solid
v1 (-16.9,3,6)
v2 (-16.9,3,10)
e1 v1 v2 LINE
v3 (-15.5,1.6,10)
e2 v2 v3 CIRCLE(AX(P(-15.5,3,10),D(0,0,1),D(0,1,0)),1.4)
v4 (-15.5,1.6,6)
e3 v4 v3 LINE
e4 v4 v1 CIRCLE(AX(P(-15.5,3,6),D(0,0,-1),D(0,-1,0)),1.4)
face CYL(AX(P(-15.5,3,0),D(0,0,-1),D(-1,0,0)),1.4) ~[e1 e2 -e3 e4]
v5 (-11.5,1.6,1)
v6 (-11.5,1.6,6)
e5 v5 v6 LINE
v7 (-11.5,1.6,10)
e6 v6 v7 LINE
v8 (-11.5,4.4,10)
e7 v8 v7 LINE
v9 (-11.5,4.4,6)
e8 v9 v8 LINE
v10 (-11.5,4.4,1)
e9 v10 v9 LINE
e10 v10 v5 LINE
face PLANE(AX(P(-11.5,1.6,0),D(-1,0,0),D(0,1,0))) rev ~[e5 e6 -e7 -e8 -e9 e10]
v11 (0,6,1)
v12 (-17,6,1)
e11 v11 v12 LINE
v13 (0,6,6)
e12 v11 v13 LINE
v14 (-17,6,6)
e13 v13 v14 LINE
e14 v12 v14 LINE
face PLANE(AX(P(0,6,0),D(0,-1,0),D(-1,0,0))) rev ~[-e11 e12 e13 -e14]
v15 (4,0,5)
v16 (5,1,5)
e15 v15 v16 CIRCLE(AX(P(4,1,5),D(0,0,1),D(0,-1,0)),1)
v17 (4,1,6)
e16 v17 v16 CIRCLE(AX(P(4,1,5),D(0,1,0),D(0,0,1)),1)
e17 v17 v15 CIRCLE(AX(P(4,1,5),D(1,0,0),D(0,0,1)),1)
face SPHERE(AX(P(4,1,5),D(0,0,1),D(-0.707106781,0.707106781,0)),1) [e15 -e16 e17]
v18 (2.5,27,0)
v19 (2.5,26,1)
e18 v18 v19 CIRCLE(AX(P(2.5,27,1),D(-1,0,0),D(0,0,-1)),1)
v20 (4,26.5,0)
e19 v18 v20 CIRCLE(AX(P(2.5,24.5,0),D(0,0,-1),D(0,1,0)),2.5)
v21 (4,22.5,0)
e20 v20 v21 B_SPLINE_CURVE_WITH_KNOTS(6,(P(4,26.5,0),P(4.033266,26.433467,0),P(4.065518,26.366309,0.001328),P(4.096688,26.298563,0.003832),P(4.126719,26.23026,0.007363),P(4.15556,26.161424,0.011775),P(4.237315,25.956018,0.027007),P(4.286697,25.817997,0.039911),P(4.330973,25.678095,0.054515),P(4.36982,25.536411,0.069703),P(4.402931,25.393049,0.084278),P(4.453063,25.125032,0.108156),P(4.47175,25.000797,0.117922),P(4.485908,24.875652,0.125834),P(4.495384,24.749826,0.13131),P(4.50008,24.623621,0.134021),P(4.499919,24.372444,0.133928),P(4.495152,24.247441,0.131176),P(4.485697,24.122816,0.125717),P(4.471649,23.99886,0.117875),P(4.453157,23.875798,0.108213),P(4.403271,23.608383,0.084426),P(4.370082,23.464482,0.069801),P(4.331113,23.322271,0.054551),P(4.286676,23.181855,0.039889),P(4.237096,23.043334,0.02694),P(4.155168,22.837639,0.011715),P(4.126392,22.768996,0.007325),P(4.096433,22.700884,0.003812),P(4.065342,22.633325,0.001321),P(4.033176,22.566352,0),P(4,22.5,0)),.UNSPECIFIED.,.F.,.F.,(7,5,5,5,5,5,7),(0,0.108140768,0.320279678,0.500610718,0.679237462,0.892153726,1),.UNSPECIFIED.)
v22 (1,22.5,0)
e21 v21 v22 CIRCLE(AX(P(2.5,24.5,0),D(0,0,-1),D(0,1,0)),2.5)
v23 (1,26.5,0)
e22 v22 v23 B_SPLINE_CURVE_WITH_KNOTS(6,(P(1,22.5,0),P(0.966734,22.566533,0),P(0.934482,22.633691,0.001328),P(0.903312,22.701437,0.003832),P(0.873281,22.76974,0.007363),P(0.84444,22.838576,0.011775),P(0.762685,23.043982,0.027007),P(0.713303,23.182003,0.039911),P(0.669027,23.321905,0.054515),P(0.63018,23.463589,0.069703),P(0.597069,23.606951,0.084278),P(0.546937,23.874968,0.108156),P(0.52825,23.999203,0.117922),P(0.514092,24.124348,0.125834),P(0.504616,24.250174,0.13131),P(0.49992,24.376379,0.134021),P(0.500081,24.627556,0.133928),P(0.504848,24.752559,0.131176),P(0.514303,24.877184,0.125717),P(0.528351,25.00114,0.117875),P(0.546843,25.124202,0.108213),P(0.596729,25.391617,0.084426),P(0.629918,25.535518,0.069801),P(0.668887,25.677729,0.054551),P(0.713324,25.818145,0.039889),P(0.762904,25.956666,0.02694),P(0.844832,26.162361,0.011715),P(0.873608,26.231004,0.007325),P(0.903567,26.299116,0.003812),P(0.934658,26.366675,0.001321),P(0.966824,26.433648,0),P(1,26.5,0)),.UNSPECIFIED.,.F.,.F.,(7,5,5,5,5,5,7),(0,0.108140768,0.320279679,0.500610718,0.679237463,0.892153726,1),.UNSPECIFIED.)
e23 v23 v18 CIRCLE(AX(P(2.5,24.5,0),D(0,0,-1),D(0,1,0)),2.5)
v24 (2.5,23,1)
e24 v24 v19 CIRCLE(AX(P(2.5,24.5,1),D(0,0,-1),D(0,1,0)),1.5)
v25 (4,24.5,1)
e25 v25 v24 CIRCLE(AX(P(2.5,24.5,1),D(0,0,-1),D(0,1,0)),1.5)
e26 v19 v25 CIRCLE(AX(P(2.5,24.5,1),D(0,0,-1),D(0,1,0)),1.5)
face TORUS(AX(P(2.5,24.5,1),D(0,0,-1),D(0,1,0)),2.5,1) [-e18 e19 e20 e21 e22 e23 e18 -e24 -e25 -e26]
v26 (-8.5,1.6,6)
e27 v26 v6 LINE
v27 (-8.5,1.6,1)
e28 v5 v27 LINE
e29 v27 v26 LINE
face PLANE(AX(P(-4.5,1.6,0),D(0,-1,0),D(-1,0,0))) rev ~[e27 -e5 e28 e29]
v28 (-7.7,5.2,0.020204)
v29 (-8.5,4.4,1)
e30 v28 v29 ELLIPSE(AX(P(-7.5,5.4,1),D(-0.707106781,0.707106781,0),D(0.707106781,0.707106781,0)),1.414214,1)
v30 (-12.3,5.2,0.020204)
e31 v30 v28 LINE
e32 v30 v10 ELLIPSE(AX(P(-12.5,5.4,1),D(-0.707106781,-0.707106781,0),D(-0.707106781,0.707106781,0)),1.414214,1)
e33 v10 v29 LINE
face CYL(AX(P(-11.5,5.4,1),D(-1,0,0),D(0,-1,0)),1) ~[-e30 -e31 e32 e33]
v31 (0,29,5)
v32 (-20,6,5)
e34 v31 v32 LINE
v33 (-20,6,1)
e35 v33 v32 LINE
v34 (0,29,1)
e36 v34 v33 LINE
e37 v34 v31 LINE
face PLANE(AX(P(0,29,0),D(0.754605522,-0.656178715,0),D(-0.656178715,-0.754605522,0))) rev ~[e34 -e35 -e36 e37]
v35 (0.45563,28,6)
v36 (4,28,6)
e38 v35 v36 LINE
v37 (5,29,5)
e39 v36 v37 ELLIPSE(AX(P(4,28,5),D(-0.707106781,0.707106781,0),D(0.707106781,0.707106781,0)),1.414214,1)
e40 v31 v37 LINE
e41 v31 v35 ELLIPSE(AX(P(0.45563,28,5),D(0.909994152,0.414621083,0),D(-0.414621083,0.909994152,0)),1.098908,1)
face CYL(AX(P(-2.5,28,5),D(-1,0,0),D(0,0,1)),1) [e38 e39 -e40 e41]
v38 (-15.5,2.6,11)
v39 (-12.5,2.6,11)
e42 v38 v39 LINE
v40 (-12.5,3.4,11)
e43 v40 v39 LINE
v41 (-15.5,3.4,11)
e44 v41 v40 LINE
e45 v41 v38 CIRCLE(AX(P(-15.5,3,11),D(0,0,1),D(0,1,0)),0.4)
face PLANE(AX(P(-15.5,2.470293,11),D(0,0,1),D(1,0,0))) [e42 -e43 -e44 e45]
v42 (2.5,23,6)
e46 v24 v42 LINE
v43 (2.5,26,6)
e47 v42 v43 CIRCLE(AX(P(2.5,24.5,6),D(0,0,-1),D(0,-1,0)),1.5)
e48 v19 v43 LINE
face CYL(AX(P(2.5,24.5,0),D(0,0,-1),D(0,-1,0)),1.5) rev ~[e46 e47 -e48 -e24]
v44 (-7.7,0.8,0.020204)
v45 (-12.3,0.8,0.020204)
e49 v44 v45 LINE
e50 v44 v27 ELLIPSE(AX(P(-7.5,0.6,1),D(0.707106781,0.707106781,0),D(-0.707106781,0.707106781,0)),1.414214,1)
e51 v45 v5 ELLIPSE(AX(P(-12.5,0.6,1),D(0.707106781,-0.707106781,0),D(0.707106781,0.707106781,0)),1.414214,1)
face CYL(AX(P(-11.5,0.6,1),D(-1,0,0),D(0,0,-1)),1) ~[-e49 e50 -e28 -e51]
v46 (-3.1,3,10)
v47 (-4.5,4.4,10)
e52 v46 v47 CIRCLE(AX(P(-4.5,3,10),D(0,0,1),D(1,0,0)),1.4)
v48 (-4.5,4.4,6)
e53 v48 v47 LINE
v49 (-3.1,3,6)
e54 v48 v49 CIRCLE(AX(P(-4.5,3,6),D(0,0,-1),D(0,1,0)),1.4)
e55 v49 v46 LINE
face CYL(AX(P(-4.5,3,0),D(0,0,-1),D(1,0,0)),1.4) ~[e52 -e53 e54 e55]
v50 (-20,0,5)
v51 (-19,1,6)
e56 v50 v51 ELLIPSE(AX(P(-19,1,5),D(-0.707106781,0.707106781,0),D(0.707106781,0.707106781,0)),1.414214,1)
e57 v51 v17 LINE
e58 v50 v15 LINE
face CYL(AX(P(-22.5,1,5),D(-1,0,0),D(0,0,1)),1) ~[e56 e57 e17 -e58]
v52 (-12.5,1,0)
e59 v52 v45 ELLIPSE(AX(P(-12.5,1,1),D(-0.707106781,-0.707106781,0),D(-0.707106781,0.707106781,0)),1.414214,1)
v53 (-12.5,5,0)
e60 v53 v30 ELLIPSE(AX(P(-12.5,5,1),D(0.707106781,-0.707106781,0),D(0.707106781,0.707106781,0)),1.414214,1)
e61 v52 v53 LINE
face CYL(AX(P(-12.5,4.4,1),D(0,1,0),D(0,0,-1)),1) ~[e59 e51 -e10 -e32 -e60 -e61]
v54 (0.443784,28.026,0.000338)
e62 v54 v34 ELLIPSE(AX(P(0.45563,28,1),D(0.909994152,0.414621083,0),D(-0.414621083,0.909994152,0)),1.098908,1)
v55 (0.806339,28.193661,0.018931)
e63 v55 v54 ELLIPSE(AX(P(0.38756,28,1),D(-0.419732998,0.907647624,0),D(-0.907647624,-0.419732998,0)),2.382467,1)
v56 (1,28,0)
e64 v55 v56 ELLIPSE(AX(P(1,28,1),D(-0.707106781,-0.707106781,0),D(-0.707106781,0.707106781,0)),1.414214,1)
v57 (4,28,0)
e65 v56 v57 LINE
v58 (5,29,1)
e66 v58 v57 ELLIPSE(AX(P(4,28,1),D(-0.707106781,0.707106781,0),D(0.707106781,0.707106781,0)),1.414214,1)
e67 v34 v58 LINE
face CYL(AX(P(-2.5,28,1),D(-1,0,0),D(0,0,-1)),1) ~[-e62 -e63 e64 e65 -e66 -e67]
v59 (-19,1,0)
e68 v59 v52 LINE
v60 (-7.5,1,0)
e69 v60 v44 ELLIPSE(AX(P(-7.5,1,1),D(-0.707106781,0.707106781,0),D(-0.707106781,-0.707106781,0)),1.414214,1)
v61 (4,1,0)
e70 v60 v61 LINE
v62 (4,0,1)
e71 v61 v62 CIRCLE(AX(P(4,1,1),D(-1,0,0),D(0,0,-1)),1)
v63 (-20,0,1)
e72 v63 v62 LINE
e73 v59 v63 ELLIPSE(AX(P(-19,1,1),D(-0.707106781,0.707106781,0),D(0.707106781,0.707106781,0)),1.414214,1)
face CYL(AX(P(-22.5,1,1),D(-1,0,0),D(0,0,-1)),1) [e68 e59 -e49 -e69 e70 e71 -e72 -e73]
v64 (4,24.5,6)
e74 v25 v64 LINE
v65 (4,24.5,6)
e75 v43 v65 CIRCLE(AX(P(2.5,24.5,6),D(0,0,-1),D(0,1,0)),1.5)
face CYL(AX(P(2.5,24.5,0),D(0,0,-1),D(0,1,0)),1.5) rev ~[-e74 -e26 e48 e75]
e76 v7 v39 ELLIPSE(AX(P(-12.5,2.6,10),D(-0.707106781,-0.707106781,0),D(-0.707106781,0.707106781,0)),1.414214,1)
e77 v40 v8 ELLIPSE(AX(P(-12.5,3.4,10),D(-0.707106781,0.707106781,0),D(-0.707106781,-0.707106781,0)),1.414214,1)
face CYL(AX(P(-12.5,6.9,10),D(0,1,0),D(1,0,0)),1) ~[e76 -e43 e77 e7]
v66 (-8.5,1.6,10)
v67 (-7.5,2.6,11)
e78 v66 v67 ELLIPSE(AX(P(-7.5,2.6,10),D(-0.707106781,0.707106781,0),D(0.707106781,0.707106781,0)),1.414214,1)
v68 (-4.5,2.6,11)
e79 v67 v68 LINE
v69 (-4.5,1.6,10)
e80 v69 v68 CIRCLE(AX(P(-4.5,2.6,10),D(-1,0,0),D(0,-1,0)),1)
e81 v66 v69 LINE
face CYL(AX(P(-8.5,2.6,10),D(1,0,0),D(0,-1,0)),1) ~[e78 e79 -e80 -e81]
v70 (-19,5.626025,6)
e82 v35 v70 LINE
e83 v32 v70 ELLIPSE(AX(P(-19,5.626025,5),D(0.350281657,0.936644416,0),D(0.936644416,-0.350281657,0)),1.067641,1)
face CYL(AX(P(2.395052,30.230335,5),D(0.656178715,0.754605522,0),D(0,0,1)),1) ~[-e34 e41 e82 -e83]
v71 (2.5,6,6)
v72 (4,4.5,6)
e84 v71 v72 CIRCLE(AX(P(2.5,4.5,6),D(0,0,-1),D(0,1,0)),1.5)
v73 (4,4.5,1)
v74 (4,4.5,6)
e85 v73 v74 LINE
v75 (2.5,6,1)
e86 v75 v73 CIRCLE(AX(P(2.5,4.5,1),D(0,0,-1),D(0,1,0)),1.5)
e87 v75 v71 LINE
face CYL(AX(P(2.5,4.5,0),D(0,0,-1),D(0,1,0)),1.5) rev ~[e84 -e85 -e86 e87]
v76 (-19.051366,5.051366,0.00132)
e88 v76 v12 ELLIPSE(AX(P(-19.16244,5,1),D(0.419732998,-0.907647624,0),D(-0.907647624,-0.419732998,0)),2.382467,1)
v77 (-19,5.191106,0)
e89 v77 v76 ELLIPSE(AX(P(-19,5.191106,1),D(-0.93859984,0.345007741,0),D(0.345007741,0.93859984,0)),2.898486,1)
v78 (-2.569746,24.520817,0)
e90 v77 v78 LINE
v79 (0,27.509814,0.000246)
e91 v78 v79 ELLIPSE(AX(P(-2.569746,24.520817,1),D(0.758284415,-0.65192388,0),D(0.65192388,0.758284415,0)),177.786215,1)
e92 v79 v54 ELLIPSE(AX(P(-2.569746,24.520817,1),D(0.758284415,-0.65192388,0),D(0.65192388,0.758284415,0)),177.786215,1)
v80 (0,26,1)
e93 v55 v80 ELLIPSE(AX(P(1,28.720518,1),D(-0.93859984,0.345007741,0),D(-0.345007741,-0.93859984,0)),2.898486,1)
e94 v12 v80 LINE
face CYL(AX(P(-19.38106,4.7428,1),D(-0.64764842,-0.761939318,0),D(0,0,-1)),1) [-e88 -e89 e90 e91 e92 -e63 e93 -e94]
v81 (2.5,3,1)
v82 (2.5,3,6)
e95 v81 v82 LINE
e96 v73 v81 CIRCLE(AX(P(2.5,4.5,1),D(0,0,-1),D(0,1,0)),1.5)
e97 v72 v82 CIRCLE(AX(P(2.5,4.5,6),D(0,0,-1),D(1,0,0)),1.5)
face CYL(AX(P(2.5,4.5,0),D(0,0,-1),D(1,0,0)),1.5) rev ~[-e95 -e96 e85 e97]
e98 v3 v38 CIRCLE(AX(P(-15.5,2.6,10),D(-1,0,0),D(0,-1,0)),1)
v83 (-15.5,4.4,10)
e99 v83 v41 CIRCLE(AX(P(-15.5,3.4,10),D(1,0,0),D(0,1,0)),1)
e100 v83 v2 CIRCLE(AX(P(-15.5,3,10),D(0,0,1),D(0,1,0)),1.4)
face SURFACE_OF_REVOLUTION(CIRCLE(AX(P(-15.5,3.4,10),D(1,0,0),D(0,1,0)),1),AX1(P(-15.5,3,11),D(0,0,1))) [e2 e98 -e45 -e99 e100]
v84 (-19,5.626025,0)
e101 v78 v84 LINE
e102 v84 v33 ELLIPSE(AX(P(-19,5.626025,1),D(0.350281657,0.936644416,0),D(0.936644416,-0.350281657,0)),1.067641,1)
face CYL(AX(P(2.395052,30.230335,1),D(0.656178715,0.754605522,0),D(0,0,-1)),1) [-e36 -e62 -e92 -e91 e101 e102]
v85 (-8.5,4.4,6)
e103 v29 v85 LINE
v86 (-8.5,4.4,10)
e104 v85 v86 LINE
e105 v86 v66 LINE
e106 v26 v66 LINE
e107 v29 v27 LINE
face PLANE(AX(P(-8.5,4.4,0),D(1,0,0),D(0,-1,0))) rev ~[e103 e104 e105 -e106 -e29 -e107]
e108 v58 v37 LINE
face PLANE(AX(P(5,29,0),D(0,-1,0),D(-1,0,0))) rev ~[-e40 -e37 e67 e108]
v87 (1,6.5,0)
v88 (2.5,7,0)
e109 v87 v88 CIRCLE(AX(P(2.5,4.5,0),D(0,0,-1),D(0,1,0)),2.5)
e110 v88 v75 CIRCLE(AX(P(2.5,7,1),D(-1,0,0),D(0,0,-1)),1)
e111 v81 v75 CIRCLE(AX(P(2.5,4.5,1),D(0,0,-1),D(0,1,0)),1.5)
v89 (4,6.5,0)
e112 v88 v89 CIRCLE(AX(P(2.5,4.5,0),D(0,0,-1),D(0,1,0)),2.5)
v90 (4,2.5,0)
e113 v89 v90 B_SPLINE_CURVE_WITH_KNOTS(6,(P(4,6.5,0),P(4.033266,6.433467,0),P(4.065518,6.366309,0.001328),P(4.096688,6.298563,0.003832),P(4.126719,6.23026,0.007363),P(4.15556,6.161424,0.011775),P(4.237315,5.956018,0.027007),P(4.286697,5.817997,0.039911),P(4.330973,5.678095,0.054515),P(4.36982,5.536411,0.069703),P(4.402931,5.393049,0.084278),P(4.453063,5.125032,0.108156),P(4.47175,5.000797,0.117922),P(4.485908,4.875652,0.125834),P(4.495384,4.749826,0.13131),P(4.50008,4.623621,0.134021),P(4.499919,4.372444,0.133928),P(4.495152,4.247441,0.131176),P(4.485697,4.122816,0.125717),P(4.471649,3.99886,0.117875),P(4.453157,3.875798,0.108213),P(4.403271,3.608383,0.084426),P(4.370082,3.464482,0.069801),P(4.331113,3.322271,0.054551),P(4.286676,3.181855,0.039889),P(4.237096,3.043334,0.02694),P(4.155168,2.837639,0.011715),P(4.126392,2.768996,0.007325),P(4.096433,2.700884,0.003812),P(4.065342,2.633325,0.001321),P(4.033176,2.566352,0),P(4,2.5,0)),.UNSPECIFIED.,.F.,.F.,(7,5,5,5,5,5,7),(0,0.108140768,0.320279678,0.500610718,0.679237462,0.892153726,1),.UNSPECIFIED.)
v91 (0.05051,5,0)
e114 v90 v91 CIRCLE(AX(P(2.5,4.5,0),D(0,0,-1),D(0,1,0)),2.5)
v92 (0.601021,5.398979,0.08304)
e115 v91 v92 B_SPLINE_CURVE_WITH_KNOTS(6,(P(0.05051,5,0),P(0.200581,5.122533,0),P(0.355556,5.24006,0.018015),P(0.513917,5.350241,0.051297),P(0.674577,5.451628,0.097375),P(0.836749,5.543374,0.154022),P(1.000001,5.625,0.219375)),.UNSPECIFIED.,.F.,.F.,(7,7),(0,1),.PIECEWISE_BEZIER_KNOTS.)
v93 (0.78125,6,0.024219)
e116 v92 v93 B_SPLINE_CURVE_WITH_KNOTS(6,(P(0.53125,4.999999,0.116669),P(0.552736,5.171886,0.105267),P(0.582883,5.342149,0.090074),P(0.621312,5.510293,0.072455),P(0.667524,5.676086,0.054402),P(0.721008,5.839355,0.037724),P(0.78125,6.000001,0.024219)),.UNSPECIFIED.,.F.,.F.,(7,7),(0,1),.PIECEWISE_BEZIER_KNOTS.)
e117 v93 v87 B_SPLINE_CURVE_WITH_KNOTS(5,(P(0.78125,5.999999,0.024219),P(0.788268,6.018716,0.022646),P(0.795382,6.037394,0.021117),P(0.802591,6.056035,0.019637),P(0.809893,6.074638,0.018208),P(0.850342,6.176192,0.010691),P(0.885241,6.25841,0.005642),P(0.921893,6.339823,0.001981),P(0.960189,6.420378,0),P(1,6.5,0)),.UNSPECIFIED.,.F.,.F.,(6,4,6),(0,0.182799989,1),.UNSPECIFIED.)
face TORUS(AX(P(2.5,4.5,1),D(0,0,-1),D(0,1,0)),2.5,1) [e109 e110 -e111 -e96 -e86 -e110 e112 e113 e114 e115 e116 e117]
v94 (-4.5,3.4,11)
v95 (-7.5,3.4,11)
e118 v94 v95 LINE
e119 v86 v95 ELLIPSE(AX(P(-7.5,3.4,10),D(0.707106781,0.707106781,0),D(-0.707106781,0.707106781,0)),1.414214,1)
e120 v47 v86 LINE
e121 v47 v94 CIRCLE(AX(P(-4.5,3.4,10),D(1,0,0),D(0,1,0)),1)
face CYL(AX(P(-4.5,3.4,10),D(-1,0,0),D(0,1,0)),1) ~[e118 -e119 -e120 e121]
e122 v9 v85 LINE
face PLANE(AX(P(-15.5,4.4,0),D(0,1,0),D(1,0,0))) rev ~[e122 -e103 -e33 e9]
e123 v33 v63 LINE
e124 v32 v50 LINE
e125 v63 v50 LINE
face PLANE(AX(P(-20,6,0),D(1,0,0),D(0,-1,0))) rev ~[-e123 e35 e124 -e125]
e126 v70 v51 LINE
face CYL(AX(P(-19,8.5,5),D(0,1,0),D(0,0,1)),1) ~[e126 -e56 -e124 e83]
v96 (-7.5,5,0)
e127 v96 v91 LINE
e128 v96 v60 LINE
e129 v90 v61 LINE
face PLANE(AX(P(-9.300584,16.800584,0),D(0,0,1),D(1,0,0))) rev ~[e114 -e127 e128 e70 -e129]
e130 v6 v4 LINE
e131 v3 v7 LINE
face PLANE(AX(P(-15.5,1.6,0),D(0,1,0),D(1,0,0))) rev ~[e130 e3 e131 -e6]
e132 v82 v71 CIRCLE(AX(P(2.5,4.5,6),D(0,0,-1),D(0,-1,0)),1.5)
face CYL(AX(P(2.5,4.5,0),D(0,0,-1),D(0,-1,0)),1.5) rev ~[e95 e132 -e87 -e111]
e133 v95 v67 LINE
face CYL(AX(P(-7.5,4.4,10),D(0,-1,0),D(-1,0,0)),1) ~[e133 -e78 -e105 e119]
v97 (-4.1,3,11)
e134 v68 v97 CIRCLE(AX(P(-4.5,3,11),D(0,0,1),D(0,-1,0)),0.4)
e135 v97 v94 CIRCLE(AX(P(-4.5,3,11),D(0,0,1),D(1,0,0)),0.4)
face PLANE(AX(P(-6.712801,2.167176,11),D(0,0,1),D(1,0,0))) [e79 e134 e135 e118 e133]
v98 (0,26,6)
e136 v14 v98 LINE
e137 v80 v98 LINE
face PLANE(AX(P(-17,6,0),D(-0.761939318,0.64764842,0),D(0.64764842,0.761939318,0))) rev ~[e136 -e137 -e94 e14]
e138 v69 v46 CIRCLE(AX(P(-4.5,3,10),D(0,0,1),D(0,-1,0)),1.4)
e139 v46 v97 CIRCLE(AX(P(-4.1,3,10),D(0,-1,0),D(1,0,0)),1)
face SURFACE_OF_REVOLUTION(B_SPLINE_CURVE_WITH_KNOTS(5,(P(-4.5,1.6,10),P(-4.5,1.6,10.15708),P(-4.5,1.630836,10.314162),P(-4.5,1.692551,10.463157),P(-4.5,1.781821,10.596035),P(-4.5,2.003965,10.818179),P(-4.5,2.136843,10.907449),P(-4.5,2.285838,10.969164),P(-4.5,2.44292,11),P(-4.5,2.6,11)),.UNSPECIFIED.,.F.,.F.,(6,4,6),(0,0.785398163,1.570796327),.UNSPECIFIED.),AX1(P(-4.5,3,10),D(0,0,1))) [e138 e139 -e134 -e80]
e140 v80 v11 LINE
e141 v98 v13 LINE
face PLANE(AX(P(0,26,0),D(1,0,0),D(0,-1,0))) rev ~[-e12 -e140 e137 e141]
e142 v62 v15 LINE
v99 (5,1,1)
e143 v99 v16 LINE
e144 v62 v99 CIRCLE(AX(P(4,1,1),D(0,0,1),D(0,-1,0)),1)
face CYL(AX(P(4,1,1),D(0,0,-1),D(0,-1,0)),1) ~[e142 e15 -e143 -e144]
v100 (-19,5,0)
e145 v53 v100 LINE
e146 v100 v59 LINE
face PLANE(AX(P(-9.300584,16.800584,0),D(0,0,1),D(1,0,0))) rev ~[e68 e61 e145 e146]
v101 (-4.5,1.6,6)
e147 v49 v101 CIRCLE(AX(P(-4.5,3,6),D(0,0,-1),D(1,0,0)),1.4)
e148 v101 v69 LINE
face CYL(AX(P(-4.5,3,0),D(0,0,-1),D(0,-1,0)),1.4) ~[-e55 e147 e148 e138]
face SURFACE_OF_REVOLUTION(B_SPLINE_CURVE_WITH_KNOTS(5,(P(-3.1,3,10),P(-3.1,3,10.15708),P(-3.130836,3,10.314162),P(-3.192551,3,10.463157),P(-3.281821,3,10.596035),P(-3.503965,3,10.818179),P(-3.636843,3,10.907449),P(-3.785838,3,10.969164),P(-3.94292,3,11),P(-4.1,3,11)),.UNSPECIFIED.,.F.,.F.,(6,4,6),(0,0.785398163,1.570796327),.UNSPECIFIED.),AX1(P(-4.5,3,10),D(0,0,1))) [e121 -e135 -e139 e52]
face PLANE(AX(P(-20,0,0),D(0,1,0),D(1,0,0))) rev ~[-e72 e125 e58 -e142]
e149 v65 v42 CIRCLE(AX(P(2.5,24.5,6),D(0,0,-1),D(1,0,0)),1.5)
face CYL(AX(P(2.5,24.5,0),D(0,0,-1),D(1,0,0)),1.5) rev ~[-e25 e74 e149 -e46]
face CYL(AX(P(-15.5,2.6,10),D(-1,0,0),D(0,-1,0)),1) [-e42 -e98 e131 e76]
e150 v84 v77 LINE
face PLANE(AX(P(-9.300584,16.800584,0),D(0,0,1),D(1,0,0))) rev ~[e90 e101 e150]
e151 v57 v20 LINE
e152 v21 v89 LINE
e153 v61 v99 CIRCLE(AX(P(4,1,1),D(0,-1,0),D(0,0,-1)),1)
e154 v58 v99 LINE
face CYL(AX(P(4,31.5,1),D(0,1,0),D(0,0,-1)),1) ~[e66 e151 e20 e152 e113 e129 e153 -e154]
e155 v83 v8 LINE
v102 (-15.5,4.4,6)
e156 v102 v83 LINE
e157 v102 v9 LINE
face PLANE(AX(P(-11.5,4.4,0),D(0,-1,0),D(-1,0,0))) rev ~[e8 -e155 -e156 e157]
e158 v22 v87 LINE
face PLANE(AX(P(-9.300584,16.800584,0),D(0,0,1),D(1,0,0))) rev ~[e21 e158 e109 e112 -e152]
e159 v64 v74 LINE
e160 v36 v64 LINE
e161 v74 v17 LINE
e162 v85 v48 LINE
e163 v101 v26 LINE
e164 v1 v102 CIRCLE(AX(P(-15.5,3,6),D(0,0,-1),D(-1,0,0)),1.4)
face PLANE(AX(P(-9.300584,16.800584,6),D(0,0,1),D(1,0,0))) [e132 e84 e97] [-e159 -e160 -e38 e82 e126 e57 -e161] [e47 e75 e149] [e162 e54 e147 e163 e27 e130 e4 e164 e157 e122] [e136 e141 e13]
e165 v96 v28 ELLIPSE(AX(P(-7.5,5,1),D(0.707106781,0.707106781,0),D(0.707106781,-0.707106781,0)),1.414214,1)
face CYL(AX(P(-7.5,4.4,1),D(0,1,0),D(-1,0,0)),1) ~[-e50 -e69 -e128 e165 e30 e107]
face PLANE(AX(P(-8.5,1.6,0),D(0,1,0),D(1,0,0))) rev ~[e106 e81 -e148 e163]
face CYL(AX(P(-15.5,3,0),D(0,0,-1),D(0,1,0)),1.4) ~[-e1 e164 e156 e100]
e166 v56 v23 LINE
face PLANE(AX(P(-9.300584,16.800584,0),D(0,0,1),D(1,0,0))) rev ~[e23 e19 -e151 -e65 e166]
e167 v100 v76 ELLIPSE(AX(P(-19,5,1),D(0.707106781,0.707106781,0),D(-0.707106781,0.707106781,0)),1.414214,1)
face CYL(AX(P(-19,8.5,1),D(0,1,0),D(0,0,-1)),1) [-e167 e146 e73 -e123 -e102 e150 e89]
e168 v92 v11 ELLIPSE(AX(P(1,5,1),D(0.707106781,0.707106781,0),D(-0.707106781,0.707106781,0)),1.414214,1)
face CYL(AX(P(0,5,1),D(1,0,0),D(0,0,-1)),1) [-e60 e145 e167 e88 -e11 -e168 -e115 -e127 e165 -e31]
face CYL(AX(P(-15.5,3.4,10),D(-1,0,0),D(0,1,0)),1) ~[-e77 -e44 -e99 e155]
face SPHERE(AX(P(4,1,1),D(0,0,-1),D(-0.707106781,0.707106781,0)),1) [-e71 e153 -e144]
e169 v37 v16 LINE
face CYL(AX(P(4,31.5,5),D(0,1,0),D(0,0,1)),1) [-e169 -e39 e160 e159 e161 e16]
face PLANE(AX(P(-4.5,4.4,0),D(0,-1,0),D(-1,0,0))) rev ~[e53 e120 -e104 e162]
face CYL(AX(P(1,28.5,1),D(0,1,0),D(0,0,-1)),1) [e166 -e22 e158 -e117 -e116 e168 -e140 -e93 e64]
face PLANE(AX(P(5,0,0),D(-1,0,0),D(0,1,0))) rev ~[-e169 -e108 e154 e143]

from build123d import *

# Parameters (mm, degrees)
F1_DEPTH      = 6
F2_DEPTH      = 11
F3_R          = 1
F4_T1_DEPTH   = 35.4795013083
F4_T3_DEPTH   = 11
F4_T5_DEPTH   = 26.5
F4_T7_DEPTH   = 30.5
F4_T9_DEPTH   = 10
F4_T11_DEPTH  = 3
F4_T13_DEPTH  = 2.8
F4_T15_DEPTH  = 4
F4_T17_DEPTH  = 6.5
F4_T19_DEPTH  = 7.8
F4_S23_W      = 1
F4_S23_H      = 1
F4_T24_DEPTH  = 1
F4_S29_W      = 1
F4_S29_H      = 1
F4_T30_DEPTH  = 1
F4_T36_DEPTH  = 31.2488094968
F4_T42_DEPTH  = 22.5
F4_T47_DEPTH  = 19.5
F4_T54_ANGLE  = 180
F4_T59_DEPTH  = 5.5
F4_T63_DEPTH  = 5.3
F4_T70_DEPTH  = 5.3
F4_T74_DEPTH  = 5.5
F4_T81_DEPTH  = 5.3
F4_T85_DEPTH  = 5.5
F4_T92_DEPTH  = 5.5
F4_T96_DEPTH  = 5.3
F4_T103_DEPTH = 31.2488094968
F4_T107_DEPTH = 19.5
F4_T114_DEPTH = 31.2488094968
F4_T118_DEPTH = 22.5
F4_T125_DEPTH = 25
F4_T129_DEPTH = 22


# Not quite as in the source:
# - a fillet or chamfer that OpenCascade refuses, or shapes differently, is made with other operations: its cross-section is extruded or revolved along the edge and cut away or added


with BuildPart() as f1:
    # F0 (on Top) → F1 (new body)
    with BuildSketch(Plane.XY):
        Polygon((0, 29), (-20, 6), (-17, 6), (0, 26), align=None)
        with BuildLine():
            Line((0, 3), (0, 0))
            Line((0, 0), (2.5, 0))
            Line((2.5, 0), (2.5, 3))
            ThreePointArc((2.5, 3), (1, 4.5), (2.5, 6))
            Line((2.5, 6), (2.5, 23))
            ThreePointArc((2.5, 23), (1, 24.5), (2.5, 26))
            Line((2.5, 26), (2.5, 29))
            Line((2.5, 29), (0, 29))
            Line((0, 29), (0, 26))
            Line((0, 26), (0, 6))
            Line((0, 6), (0, 3))
        make_face()
        with BuildLine():
            Line((2.5, 3), (2.5, 0))
            Line((2.5, 0), (5, 0))
            Line((5, 0), (5, 15))
            Line((5, 15), (5, 29))
            Line((5, 29), (2.5, 29))
            Line((2.5, 29), (2.5, 26))
            ThreePointArc((2.5, 26), (3.5606601718, 25.5606601718), (4, 24.5))
            ThreePointArc((4, 24.5), (3.5606601718, 23.4393398282), (2.5, 23))
            Line((2.5, 23), (2.5, 6))
            ThreePointArc((2.5, 6), (3.5606601718, 5.5606601718), (4, 4.5))
            ThreePointArc((4, 4.5), (3.5606601718, 3.4393398282), (2.5, 3))
        make_face()
        with BuildLine():
            Line((-3.1, 3), (0, 3))
            Line((0, 3), (0, 6))
            Line((0, 6), (-17, 6))
            Line((-17, 6), (-20, 6))
            Line((-20, 6), (-20, 3))
            Line((-20, 3), (-16.9, 3))
            ThreePointArc((-16.9, 3), (-16.4899494937, 3.9899494937), (-15.5, 4.4))
            Line((-15.5, 4.4), (-11.5, 4.4))
            Line((-11.5, 4.4), (-10, 4.4))
            Line((-10, 4.4), (-8.5, 4.4))
            Line((-8.5, 4.4), (-4.5, 4.4))
            ThreePointArc((-4.5, 4.4), (-3.5100505063, 3.9899494937), (-3.1, 3))
        make_face()
        with BuildLine():
            Line((-20, 0), (0, 0))
            Line((0, 0), (0, 3))
            Line((0, 3), (-3.1, 3))
            ThreePointArc((-3.1, 3), (-3.5100505063, 2.0100505063), (-4.5, 1.6))
            Line((-4.5, 1.6), (-8.5, 1.6))
            Line((-8.5, 1.6), (-10, 1.6))
            Line((-10, 1.6), (-11.5, 1.6))
            Line((-11.5, 1.6), (-15.5, 1.6))
            ThreePointArc((-15.5, 1.6), (-16.4899494937, 2.0100505063), (-16.9, 3))
            Line((-16.9, 3), (-20, 3))
            Line((-20, 3), (-20, 0))
        make_face()
    extrude(amount=F1_DEPTH)

    # F0 (on Top) → F2 (join)
    with BuildSketch(Plane.XY):
        with BuildLine():
            Line((-14.1, 3), (-16.9, 3))
            ThreePointArc((-16.9, 3), (-16.4899494937, 2.0100505063), (-15.5, 1.6))
            ThreePointArc((-15.5, 1.6), (-14.5100505063, 2.0100505063), (-14.1, 3))
        make_face()
        with BuildLine():
            ThreePointArc((-4.5, 1.6), (-5.4899494937, 2.0100505063), (-5.9, 3))
            Line((-5.9, 3), (-8.5, 3))
            Line((-8.5, 3), (-8.5, 1.6))
            Line((-8.5, 1.6), (-4.5, 1.6))
        make_face()
        with BuildLine():
            Line((-11.5, 3), (-14.1, 3))
            ThreePointArc((-14.1, 3), (-14.5100505063, 2.0100505063), (-15.5, 1.6))
            Line((-15.5, 1.6), (-11.5, 1.6))
            Line((-11.5, 1.6), (-11.5, 3))
        make_face()
        with BuildLine():
            ThreePointArc((-15.5, 4.4), (-14.5100505063, 3.9899494937), (-14.1, 3))
            Line((-14.1, 3), (-11.5, 3))
            Line((-11.5, 3), (-11.5, 4.4))
            Line((-11.5, 4.4), (-15.5, 4.4))
        make_face()
        with BuildLine():
            Line((-8.5, 3), (-5.9, 3))
            ThreePointArc((-5.9, 3), (-5.4899494937, 3.9899494937), (-4.5, 4.4))
            Line((-4.5, 4.4), (-8.5, 4.4))
            Line((-8.5, 4.4), (-8.5, 3))
        make_face()
        with BuildLine():
            Line((-5.9, 3), (-3.1, 3))
            ThreePointArc((-3.1, 3), (-3.5100505063, 3.9899494937), (-4.5, 4.4))
            ThreePointArc((-4.5, 4.4), (-5.4899494937, 3.9899494937), (-5.9, 3))
        make_face()
        with BuildLine():
            ThreePointArc((-4.5, 1.6), (-3.5100505063, 2.0100505063), (-3.1, 3))
            Line((-3.1, 3), (-5.9, 3))
            ThreePointArc((-5.9, 3), (-5.4899494937, 2.0100505063), (-4.5, 1.6))
        make_face()
        with BuildLine():
            ThreePointArc((-15.5, 4.4), (-16.4899494937, 3.9899494937), (-16.9, 3))
            Line((-16.9, 3), (-14.1, 3))
            ThreePointArc((-14.1, 3), (-14.5100505063, 3.9899494937), (-15.5, 4.4))
        make_face()
    extrude(amount=F2_DEPTH)

    # F3
    f3_edges = [f1.edges().sort_by_distance(p)[0] for p in [
        (-6.5, 4.4, 11),
        (-8.5, 3, 11),
        (-6.5, 1.6, 11),
        (-3.1, 3, 11),
    ]]
    fillet(f3_edges, radius=F3_R)

    # F4: fillet of radius 1 on 24 edges, made by hand

    # F4_s2 → F4_t1 (cut)
    with BuildSketch(Plane(origin=(15.9999731598, 18.3999691337, 0), x_dir=(0, 0, 1), z_dir=(-0.6561787149, -0.7546055222, 0))):
        with BuildLine():
            ThreePointArc((0, 18.0291827328), (0.2928932188, 18.736289514), (1, 19.0291827328))
            Line((1, 19.0291827328), (0, 19.0291827328))
            Line((0, 19.0291827328), (0, 18.0291827328))
        make_face()
        with BuildLine():
            ThreePointArc((6, 18.0291827328), (5.7071067812, 18.736289514), (5, 19.0291827328))
            Line((5, 19.0291827328), (6, 19.0291827328))
            Line((6, 19.0291827328), (6, 18.0291827328))
        make_face()
    extrude(amount=F4_T1_DEPTH, mode=Mode.SUBTRACT)

    # F4_s4 → F4_t3 (cut)
    with BuildSketch(Plane.XZ.offset(-8.5)):
        with BuildLine():
            ThreePointArc((-19, 0), (-19.7071067812, 0.2928932188), (-20, 1))
            Line((-20, 1), (-20, 0))
            Line((-20, 0), (-19, 0))
        make_face()
        with BuildLine():
            ThreePointArc((-19, 6), (-19.7071067812, 5.7071067812), (-20, 5))
            Line((-20, 5), (-20, 6))
            Line((-20, 6), (-19, 6))
        make_face()
    extrude(amount=F4_T3_DEPTH, mode=Mode.SUBTRACT)

    # F4_s6 → F4_t5 (cut)
    with BuildSketch(Plane.YZ.offset(-22.5)):
        with BuildLine():
            ThreePointArc((1, 0), (0.2928932188, 0.2928932188), (0, 1))
            Line((0, 1), (0, 0))
            Line((0, 0), (1, 0))
        make_face()
        with BuildLine():
            ThreePointArc((1, 6), (0.2928932188, 5.7071067812), (0, 5))
            Line((0, 5), (0, 6))
            Line((0, 6), (1, 6))
        make_face()
    extrude(amount=F4_T5_DEPTH, mode=Mode.SUBTRACT)

    # F4_s8 → F4_t7 (cut)
    with BuildSketch(Plane.XZ.offset(-31.5)):
        with BuildLine():
            ThreePointArc((4, 0), (4.7071067812, 0.2928932188), (5, 1))
            Line((5, 1), (5, 0))
            Line((5, 0), (4, 0))
        make_face()
        with BuildLine():
            ThreePointArc((4, 6), (4.7071067812, 5.7071067812), (5, 5))
            Line((5, 5), (5, 6))
            Line((5, 6), (4, 6))
        make_face()
    extrude(amount=F4_T7_DEPTH, mode=Mode.SUBTRACT)

    # F4_s10 → F4_t9 (cut)
    with BuildSketch(Plane.YZ.offset(-2.5)):
        with BuildLine():
            ThreePointArc((28, 0), (28.7071067812, 0.2928932188), (29, 1))
            Line((29, 1), (29, 0))
            Line((29, 0), (28, 0))
        make_face()
        with BuildLine():
            ThreePointArc((28, 6), (28.7071067812, 5.7071067812), (29, 5))
            Line((29, 5), (29, 6))
            Line((29, 6), (28, 6))
        make_face()
    extrude(amount=F4_T9_DEPTH, mode=Mode.SUBTRACT)

    # F4_s12 → F4_t11 (cut)
    with BuildSketch(Plane.YZ.offset(-11.5)):
        with BuildLine():
            ThreePointArc((4.4, 1), (4.6928932188, 0.2928932188), (5.4, 0))
            Line((5.4, 0), (4.4, 0))
            Line((4.4, 0), (4.4, 1))
        make_face()
        with BuildLine():
            ThreePointArc((0.6, 0), (1.3071067812, 0.2928932188), (1.6, 1))
            Line((1.6, 1), (1.6, 0))
            Line((1.6, 0), (0.6, 0))
        make_face()
    extrude(amount=F4_T11_DEPTH, mode=Mode.SUBTRACT)

    # F4_s14 → F4_t13 (cut)
    with BuildSketch(Plane.XZ.offset(-4.4)):
        with BuildLine():
            ThreePointArc((-8.5, 1), (-8.2071067812, 0.2928932188), (-7.5, 0))
            Line((-7.5, 0), (-8.5, 0))
            Line((-8.5, 0), (-8.5, 1))
        make_face()
        with BuildLine():
            ThreePointArc((-12.5, 0), (-11.7928932188, 0.2928932188), (-11.5, 1))
            Line((-11.5, 1), (-11.5, 0))
            Line((-11.5, 0), (-12.5, 0))
        make_face()
    extrude(amount=F4_T13_DEPTH, mode=Mode.SUBTRACT)

    # F4_s16 → F4_t15 (cut)
    with BuildSketch(Plane.XY.offset(1)):
        with BuildLine():
            ThreePointArc((4, 0), (4.7071067812, 0.2928932188), (5, 1))
            Line((5, 1), (5, 0))
            Line((5, 0), (4, 0))
        make_face()
    extrude(amount=F4_T15_DEPTH, mode=Mode.SUBTRACT)

    # F4_s18 → F4_t17 (cut)
    with BuildSketch(Plane.YZ.offset(-15.5)):
        with BuildLine():
            ThreePointArc((4.4, 10), (4.1071067812, 10.7071067812), (3.4, 11))
            Line((3.4, 11), (4.4, 11))
            Line((4.4, 11), (4.4, 10))
        make_face()
        with BuildLine():
            ThreePointArc((1.6, 10), (1.8928932188, 10.7071067812), (2.6, 11))
            Line((2.6, 11), (1.6, 11))
            Line((1.6, 11), (1.6, 10))
        make_face()
    extrude(amount=F4_T17_DEPTH, mode=Mode.SUBTRACT)

    # F4_s20 → F4_t19 (cut)
    with BuildSketch(Plane.XZ.offset(-6.9)):
        with BuildLine():
            ThreePointArc((-11.5, 10), (-11.7928932188, 10.7071067812), (-12.5, 11))
            Line((-12.5, 11), (-11.5, 11))
            Line((-11.5, 11), (-11.5, 10))
        make_face()
    extrude(amount=F4_T19_DEPTH, mode=Mode.SUBTRACT)


with BuildPart() as f4_tool22:
    # F4_s23 → F4_t24 (new body)
    with BuildSketch(Plane.XY.offset(1)):
        with Locations((4.5, 0.5)):
            Rectangle(F4_S23_W, F4_S23_H)
    extrude(amount=-F4_T24_DEPTH)

    # F4_s25 → F4_t26 (revolve, cut)
    with BuildSketch(Plane(origin=(4, 1, 1), x_dir=(-0.7071067812, 0.7071067812, 0), z_dir=(-0.7071067812, -0.7071067812, 0))):
        with BuildLine():
            ThreePointArc((0, -1), (1, 0), (0, 1))
            Line((0, 1), (0, -1))
        make_face()
    revolve(axis=Axis((4, 1, 1), (0, 0, -1)), mode=Mode.SUBTRACT)


with BuildPart() as f1_1:
    add(f1.part)

    # F4_t21: cut F4_tool22
    add(f4_tool22.part, mode=Mode.SUBTRACT)


with BuildPart() as f4_tool28:
    # F4_s29 → F4_t30 (new body)
    with BuildSketch(Plane.XY.offset(5)):
        with Locations((4.5, 0.5)):
            Rectangle(F4_S29_W, F4_S29_H)
    extrude(amount=F4_T30_DEPTH)

    # F4_s31 → F4_t32 (revolve, cut)
    with BuildSketch(Plane(origin=(4, 1, 5), x_dir=(-0.7071067812, 0.7071067812, 0), z_dir=(0.7071067812, 0.7071067812, 0))):
        with BuildLine():
            ThreePointArc((0, -1), (1, 0), (0, 1))
            Line((0, 1), (0, -1))
        make_face()
    revolve(axis=Axis((4, 1, 5), (0, 0, 1)), mode=Mode.SUBTRACT)


with BuildPart() as f1_2:
    add(f1_1.part)

    # F4_t27: cut F4_tool28
    add(f4_tool28.part, mode=Mode.SUBTRACT)


with BuildPart() as f4_tool34:
    # F4_s35 → F4_t36 (new body)
    with BuildSketch(Plane(origin=(-5.788932371, -6.8105086718, 0), x_dir=(0, 0, 1), z_dir=(0.6476484201, 0.7619393178, 0))):
        with BuildLine():
            ThreePointArc((0, -17.8388589225), (0.2928932188, -17.1317521413), (1, -16.8388589225))
            Line((1, -16.8388589225), (0, -16.8388589225))
            Line((0, -16.8388589225), (0, -17.8388589225))
        make_face()
    extrude(amount=F4_T36_DEPTH)

    split(bisect_by=Plane.XZ.offset(-6), keep=Keep.BOTTOM)

    split(bisect_by=Plane.YZ, keep=Keep.BOTTOM)


with BuildPart() as f1_3:
    add(f1_2.part)

    # F4_t33: cut F4_tool34
    add(f4_tool34.part, mode=Mode.SUBTRACT)


with BuildPart() as f4_tool40:
    # F4_s41 → F4_t42 (new body)
    with BuildSketch(Plane.XZ.offset(-28.5)):
        with BuildLine():
            ThreePointArc((1, 0), (0.2928932188, 0.2928932188), (0, 1))
            Line((0, 1), (0, 0))
            Line((0, 0), (1, 0))
        make_face()
    extrude(amount=F4_T42_DEPTH)

    split(bisect_by=Plane(origin=(-12.8301886792, 10.9056603774, 0), x_dir=(0, 0, 1), z_dir=(0.7619393178, -0.6476484201, 0)), keep=Keep.TOP)


with BuildPart() as f1_4:
    add(f1_3.part)

    # F4_t39: cut F4_tool40
    add(f4_tool40.part, mode=Mode.SUBTRACT)


with BuildPart() as f4_tool45:
    # F4_s46 → F4_t47 (new body)
    with BuildSketch(Plane.YZ):
        with BuildLine():
            ThreePointArc((5, 0), (5.7071067812, 0.2928932188), (6, 1))
            Line((6, 1), (6, 0))
            Line((6, 0), (5, 0))
        make_face()
    extrude(amount=-F4_T47_DEPTH)

    split(bisect_by=Plane(origin=(-12.8301886792, 10.9056603774, 0), x_dir=(0, 0, 1), z_dir=(0.7619393178, -0.6476484201, 0)), keep=Keep.TOP)


with BuildPart() as f1_5:
    add(f1_4.part)

    # F4_t44: cut F4_tool45
    add(f4_tool45.part, mode=Mode.SUBTRACT)

    # F4_s49 → F4_t50 (revolve, cut)
    with BuildSketch(Plane.YZ.offset(2.5)):
        with BuildLine():
            ThreePointArc((7, 0), (6.2928932188, 0.2928932188), (6, 1))
            Line((6, 1), (6, 0))
            Line((6, 0), (7, 0))
        make_face()
    revolve(axis=Axis((2.5, 4.5, 0), (0, 0, -1)), mode=Mode.SUBTRACT)

    # F4_s51 → F4_t52 (revolve, cut)
    with BuildSketch(Plane.YZ.offset(2.5)):
        with BuildLine():
            ThreePointArc((27, 0), (26.2928932188, 0.2928932188), (26, 1))
            Line((26, 1), (26, 0))
            Line((26, 0), (27, 0))
        make_face()
    revolve(axis=Axis((2.5, 24.5, 0), (0, 0, -1)), mode=Mode.SUBTRACT)

    # F4_s53 → F4_t54 (revolve, cut)
    with BuildSketch(Plane.YZ.offset(-15.5)):
        with BuildLine():
            ThreePointArc((4.4, 10), (4.1071067812, 10.7071067812), (3.4, 11))
            Line((3.4, 11), (4.4, 11))
            Line((4.4, 11), (4.4, 10))
        make_face()
    revolve(axis=Axis((-15.5, 3, 11), (0, 0, 1)), revolution_arc=F4_T54_ANGLE, mode=Mode.SUBTRACT)


with BuildPart() as f4_tool57:
    # F4_s58 → F4_t59 (new body)
    with BuildSketch(Plane.YZ.offset(-14)):
        with BuildLine():
            ThreePointArc((4.4, 1), (4.6928932188, 0.2928932188), (5.4, 0))
            Line((5.4, 0), (4.4, 0))
            Line((4.4, 0), (4.4, 1))
        make_face()
    extrude(amount=F4_T59_DEPTH)

    split(bisect_by=Plane.YZ.offset(-11.5), keep=Keep.BOTTOM)


with BuildPart() as f4_tool61:
    # F4_s62 → F4_t63 (new body)
    with BuildSketch(Plane.XZ.offset(-1.6)):
        with BuildLine():
            ThreePointArc((-12.5, 0), (-11.7928932188, 0.2928932188), (-11.5, 1))
            Line((-11.5, 1), (-11.5, 0))
            Line((-11.5, 0), (-12.5, 0))
        make_face()
    extrude(amount=-F4_T63_DEPTH)

    split(bisect_by=Plane.XZ.offset(-4.4), keep=Keep.BOTTOM)


with BuildPart() as f4_tool57_1:
    add(f4_tool57.part)

    # F4_t65: intersect F4_tool61
    add(f4_tool61.part, mode=Mode.INTERSECT)


with BuildPart() as f1_6:
    add(f1_5.part)

    # F4_t55: cut F4_tool57
    add(f4_tool57_1.part, mode=Mode.SUBTRACT)


with BuildPart() as f4_tool68:
    # F4_s69 → F4_t70 (new body)
    with BuildSketch(Plane.XZ.offset(-6.9)):
        with BuildLine():
            ThreePointArc((-8.5, 1), (-8.2071067812, 0.2928932188), (-7.5, 0))
            Line((-7.5, 0), (-8.5, 0))
            Line((-8.5, 0), (-8.5, 1))
        make_face()
    extrude(amount=F4_T70_DEPTH)

    split(bisect_by=Plane.XZ.offset(-4.4), keep=Keep.BOTTOM)


with BuildPart() as f4_tool72:
    # F4_s73 → F4_t74 (new body)
    with BuildSketch(Plane.YZ.offset(-11.5)):
        with BuildLine():
            ThreePointArc((4.4, 1), (4.6928932188, 0.2928932188), (5.4, 0))
            Line((5.4, 0), (4.4, 0))
            Line((4.4, 0), (4.4, 1))
        make_face()
    extrude(amount=F4_T74_DEPTH)

    split(bisect_by=Plane.YZ.offset(-8.5), keep=Keep.TOP)


with BuildPart() as f4_tool68_1:
    add(f4_tool68.part)

    # F4_t76: intersect F4_tool72
    add(f4_tool72.part, mode=Mode.INTERSECT)


with BuildPart() as f1_7:
    add(f1_6.part)

    # F4_t66: cut F4_tool68
    add(f4_tool68_1.part, mode=Mode.SUBTRACT)


with BuildPart() as f4_tool79:
    # F4_s80 → F4_t81 (new body)
    with BuildSketch(Plane.XZ.offset(-4.4)):
        with BuildLine():
            ThreePointArc((-8.5, 1), (-8.2071067812, 0.2928932188), (-7.5, 0))
            Line((-7.5, 0), (-8.5, 0))
            Line((-8.5, 0), (-8.5, 1))
        make_face()
    extrude(amount=F4_T81_DEPTH)

    split(bisect_by=Plane.XZ.offset(-1.6), keep=Keep.TOP)


with BuildPart() as f4_tool83:
    # F4_s84 → F4_t85 (new body)
    with BuildSketch(Plane.YZ.offset(-6)):
        with BuildLine():
            ThreePointArc((0.6, 0), (1.3071067812, 0.2928932188), (1.6, 1))
            Line((1.6, 1), (1.6, 0))
            Line((1.6, 0), (0.6, 0))
        make_face()
    extrude(amount=-F4_T85_DEPTH)

    split(bisect_by=Plane.YZ.offset(-8.5), keep=Keep.TOP)


with BuildPart() as f4_tool79_1:
    add(f4_tool79.part)

    # F4_t87: intersect F4_tool83
    add(f4_tool83.part, mode=Mode.INTERSECT)


with BuildPart() as f1_8:
    add(f1_7.part)

    # F4_t77: cut F4_tool79
    add(f4_tool79_1.part, mode=Mode.SUBTRACT)


with BuildPart() as f4_tool90:
    # F4_s91 → F4_t92 (new body)
    with BuildSketch(Plane.YZ.offset(-8.5)):
        with BuildLine():
            ThreePointArc((0.6, 0), (1.3071067812, 0.2928932188), (1.6, 1))
            Line((1.6, 1), (1.6, 0))
            Line((1.6, 0), (0.6, 0))
        make_face()
    extrude(amount=-F4_T92_DEPTH)

    split(bisect_by=Plane.YZ.offset(-11.5), keep=Keep.BOTTOM)


with BuildPart() as f4_tool94:
    # F4_s95 → F4_t96 (new body)
    with BuildSketch(Plane.XZ.offset(0.9)):
        with BuildLine():
            ThreePointArc((-12.5, 0), (-11.7928932188, 0.2928932188), (-11.5, 1))
            Line((-11.5, 1), (-11.5, 0))
            Line((-11.5, 0), (-12.5, 0))
        make_face()
    extrude(amount=-F4_T96_DEPTH)

    split(bisect_by=Plane.XZ.offset(-1.6), keep=Keep.TOP)


with BuildPart() as f4_tool90_1:
    add(f4_tool90.part)

    # F4_t98: intersect F4_tool94
    add(f4_tool94.part, mode=Mode.INTERSECT)


with BuildPart() as f1_9:
    add(f1_8.part)

    # F4_t88: cut F4_tool90
    add(f4_tool90_1.part, mode=Mode.SUBTRACT)


with BuildPart() as f4_tool101:
    # F4_s102 → F4_t103 (new body)
    with BuildSketch(Plane(origin=(-5.788932371, -6.8105086718, 0), x_dir=(0, 0, 1), z_dir=(0.6476484201, 0.7619393178, 0))):
        with BuildLine():
            ThreePointArc((0, -17.8388589225), (0.2928932188, -17.1317521413), (1, -16.8388589225))
            Line((1, -16.8388589225), (0, -16.8388589225))
            Line((0, -16.8388589225), (0, -17.8388589225))
        make_face()
    extrude(amount=F4_T103_DEPTH)

    split(bisect_by=Plane.XZ.offset(-6), keep=Keep.TOP)


with BuildPart() as f4_tool105:
    # F4_s106 → F4_t107 (new body)
    with BuildSketch(Plane.YZ):
        with BuildLine():
            ThreePointArc((5, 0), (5.7071067812, 0.2928932188), (6, 1))
            Line((6, 1), (6, 0))
            Line((6, 0), (5, 0))
        make_face()
    extrude(amount=-F4_T107_DEPTH)

    split(bisect_by=Plane(origin=(-12.8301886792, 10.9056603774, 0), x_dir=(0, 0, 1), z_dir=(-0.7619393178, 0.6476484201, 0)), keep=Keep.TOP)


with BuildPart() as f4_tool101_1:
    add(f4_tool101.part)

    # F4_t109: intersect F4_tool105
    add(f4_tool105.part, mode=Mode.INTERSECT)


with BuildPart() as f1_10:
    add(f1_9.part)

    # F4_t99: cut F4_tool101
    add(f4_tool101_1.part, mode=Mode.SUBTRACT)


with BuildPart() as f4_tool112:
    # F4_s113 → F4_t114 (new body)
    with BuildSketch(Plane(origin=(-5.788932371, -6.8105086718, 0), x_dir=(0, 0, 1), z_dir=(0.6476484201, 0.7619393178, 0))):
        with BuildLine():
            ThreePointArc((0, -17.8388589225), (0.2928932188, -17.1317521413), (1, -16.8388589225))
            Line((1, -16.8388589225), (0, -16.8388589225))
            Line((0, -16.8388589225), (0, -17.8388589225))
        make_face()
    extrude(amount=F4_T114_DEPTH)

    split(bisect_by=Plane.YZ, keep=Keep.TOP)


with BuildPart() as f4_tool116:
    # F4_s117 → F4_t118 (new body)
    with BuildSketch(Plane.XZ.offset(-28.5)):
        with BuildLine():
            ThreePointArc((1, 0), (0.2928932188, 0.2928932188), (0, 1))
            Line((0, 1), (0, 0))
            Line((0, 0), (1, 0))
        make_face()
    extrude(amount=F4_T118_DEPTH)

    split(bisect_by=Plane(origin=(-12.8301886792, 10.9056603774, 0), x_dir=(0, 0, 1), z_dir=(-0.7619393178, 0.6476484201, 0)), keep=Keep.TOP)


with BuildPart() as f4_tool112_1:
    add(f4_tool112.part)

    # F4_t120: intersect F4_tool116
    add(f4_tool116.part, mode=Mode.INTERSECT)


with BuildPart() as f1_11:
    add(f1_10.part)

    # F4_t110: cut F4_tool112
    add(f4_tool112_1.part, mode=Mode.SUBTRACT)


with BuildPart() as f4_tool123:
    # F4_s124 → F4_t125 (new body)
    with BuildSketch(Plane.XZ.offset(-28.5)):
        with BuildLine():
            ThreePointArc((1, 0), (0.2928932188, 0.2928932188), (0, 1))
            Line((0, 1), (0, 0))
            Line((0, 0), (1, 0))
        make_face()
    extrude(amount=F4_T125_DEPTH)

    split(bisect_by=Plane.XZ.offset(-6), keep=Keep.TOP)


with BuildPart() as f4_tool127:
    # F4_s128 → F4_t129 (new body)
    with BuildSketch(Plane.YZ.offset(2.5)):
        with BuildLine():
            ThreePointArc((5, 0), (5.7071067812, 0.2928932188), (6, 1))
            Line((6, 1), (6, 0))
            Line((6, 0), (5, 0))
        make_face()
    extrude(amount=-F4_T129_DEPTH)

    split(bisect_by=Plane.YZ, keep=Keep.TOP)


with BuildPart() as f4_tool123_1:
    add(f4_tool123.part)

    # F4_t131: intersect F4_tool127
    add(f4_tool127.part, mode=Mode.INTERSECT)


with BuildPart() as f1_12:
    add(f1_11.part)

    # F4_t121: cut F4_tool123
    add(f4_tool123_1.part, mode=Mode.SUBTRACT)


solid = f1_12.part
